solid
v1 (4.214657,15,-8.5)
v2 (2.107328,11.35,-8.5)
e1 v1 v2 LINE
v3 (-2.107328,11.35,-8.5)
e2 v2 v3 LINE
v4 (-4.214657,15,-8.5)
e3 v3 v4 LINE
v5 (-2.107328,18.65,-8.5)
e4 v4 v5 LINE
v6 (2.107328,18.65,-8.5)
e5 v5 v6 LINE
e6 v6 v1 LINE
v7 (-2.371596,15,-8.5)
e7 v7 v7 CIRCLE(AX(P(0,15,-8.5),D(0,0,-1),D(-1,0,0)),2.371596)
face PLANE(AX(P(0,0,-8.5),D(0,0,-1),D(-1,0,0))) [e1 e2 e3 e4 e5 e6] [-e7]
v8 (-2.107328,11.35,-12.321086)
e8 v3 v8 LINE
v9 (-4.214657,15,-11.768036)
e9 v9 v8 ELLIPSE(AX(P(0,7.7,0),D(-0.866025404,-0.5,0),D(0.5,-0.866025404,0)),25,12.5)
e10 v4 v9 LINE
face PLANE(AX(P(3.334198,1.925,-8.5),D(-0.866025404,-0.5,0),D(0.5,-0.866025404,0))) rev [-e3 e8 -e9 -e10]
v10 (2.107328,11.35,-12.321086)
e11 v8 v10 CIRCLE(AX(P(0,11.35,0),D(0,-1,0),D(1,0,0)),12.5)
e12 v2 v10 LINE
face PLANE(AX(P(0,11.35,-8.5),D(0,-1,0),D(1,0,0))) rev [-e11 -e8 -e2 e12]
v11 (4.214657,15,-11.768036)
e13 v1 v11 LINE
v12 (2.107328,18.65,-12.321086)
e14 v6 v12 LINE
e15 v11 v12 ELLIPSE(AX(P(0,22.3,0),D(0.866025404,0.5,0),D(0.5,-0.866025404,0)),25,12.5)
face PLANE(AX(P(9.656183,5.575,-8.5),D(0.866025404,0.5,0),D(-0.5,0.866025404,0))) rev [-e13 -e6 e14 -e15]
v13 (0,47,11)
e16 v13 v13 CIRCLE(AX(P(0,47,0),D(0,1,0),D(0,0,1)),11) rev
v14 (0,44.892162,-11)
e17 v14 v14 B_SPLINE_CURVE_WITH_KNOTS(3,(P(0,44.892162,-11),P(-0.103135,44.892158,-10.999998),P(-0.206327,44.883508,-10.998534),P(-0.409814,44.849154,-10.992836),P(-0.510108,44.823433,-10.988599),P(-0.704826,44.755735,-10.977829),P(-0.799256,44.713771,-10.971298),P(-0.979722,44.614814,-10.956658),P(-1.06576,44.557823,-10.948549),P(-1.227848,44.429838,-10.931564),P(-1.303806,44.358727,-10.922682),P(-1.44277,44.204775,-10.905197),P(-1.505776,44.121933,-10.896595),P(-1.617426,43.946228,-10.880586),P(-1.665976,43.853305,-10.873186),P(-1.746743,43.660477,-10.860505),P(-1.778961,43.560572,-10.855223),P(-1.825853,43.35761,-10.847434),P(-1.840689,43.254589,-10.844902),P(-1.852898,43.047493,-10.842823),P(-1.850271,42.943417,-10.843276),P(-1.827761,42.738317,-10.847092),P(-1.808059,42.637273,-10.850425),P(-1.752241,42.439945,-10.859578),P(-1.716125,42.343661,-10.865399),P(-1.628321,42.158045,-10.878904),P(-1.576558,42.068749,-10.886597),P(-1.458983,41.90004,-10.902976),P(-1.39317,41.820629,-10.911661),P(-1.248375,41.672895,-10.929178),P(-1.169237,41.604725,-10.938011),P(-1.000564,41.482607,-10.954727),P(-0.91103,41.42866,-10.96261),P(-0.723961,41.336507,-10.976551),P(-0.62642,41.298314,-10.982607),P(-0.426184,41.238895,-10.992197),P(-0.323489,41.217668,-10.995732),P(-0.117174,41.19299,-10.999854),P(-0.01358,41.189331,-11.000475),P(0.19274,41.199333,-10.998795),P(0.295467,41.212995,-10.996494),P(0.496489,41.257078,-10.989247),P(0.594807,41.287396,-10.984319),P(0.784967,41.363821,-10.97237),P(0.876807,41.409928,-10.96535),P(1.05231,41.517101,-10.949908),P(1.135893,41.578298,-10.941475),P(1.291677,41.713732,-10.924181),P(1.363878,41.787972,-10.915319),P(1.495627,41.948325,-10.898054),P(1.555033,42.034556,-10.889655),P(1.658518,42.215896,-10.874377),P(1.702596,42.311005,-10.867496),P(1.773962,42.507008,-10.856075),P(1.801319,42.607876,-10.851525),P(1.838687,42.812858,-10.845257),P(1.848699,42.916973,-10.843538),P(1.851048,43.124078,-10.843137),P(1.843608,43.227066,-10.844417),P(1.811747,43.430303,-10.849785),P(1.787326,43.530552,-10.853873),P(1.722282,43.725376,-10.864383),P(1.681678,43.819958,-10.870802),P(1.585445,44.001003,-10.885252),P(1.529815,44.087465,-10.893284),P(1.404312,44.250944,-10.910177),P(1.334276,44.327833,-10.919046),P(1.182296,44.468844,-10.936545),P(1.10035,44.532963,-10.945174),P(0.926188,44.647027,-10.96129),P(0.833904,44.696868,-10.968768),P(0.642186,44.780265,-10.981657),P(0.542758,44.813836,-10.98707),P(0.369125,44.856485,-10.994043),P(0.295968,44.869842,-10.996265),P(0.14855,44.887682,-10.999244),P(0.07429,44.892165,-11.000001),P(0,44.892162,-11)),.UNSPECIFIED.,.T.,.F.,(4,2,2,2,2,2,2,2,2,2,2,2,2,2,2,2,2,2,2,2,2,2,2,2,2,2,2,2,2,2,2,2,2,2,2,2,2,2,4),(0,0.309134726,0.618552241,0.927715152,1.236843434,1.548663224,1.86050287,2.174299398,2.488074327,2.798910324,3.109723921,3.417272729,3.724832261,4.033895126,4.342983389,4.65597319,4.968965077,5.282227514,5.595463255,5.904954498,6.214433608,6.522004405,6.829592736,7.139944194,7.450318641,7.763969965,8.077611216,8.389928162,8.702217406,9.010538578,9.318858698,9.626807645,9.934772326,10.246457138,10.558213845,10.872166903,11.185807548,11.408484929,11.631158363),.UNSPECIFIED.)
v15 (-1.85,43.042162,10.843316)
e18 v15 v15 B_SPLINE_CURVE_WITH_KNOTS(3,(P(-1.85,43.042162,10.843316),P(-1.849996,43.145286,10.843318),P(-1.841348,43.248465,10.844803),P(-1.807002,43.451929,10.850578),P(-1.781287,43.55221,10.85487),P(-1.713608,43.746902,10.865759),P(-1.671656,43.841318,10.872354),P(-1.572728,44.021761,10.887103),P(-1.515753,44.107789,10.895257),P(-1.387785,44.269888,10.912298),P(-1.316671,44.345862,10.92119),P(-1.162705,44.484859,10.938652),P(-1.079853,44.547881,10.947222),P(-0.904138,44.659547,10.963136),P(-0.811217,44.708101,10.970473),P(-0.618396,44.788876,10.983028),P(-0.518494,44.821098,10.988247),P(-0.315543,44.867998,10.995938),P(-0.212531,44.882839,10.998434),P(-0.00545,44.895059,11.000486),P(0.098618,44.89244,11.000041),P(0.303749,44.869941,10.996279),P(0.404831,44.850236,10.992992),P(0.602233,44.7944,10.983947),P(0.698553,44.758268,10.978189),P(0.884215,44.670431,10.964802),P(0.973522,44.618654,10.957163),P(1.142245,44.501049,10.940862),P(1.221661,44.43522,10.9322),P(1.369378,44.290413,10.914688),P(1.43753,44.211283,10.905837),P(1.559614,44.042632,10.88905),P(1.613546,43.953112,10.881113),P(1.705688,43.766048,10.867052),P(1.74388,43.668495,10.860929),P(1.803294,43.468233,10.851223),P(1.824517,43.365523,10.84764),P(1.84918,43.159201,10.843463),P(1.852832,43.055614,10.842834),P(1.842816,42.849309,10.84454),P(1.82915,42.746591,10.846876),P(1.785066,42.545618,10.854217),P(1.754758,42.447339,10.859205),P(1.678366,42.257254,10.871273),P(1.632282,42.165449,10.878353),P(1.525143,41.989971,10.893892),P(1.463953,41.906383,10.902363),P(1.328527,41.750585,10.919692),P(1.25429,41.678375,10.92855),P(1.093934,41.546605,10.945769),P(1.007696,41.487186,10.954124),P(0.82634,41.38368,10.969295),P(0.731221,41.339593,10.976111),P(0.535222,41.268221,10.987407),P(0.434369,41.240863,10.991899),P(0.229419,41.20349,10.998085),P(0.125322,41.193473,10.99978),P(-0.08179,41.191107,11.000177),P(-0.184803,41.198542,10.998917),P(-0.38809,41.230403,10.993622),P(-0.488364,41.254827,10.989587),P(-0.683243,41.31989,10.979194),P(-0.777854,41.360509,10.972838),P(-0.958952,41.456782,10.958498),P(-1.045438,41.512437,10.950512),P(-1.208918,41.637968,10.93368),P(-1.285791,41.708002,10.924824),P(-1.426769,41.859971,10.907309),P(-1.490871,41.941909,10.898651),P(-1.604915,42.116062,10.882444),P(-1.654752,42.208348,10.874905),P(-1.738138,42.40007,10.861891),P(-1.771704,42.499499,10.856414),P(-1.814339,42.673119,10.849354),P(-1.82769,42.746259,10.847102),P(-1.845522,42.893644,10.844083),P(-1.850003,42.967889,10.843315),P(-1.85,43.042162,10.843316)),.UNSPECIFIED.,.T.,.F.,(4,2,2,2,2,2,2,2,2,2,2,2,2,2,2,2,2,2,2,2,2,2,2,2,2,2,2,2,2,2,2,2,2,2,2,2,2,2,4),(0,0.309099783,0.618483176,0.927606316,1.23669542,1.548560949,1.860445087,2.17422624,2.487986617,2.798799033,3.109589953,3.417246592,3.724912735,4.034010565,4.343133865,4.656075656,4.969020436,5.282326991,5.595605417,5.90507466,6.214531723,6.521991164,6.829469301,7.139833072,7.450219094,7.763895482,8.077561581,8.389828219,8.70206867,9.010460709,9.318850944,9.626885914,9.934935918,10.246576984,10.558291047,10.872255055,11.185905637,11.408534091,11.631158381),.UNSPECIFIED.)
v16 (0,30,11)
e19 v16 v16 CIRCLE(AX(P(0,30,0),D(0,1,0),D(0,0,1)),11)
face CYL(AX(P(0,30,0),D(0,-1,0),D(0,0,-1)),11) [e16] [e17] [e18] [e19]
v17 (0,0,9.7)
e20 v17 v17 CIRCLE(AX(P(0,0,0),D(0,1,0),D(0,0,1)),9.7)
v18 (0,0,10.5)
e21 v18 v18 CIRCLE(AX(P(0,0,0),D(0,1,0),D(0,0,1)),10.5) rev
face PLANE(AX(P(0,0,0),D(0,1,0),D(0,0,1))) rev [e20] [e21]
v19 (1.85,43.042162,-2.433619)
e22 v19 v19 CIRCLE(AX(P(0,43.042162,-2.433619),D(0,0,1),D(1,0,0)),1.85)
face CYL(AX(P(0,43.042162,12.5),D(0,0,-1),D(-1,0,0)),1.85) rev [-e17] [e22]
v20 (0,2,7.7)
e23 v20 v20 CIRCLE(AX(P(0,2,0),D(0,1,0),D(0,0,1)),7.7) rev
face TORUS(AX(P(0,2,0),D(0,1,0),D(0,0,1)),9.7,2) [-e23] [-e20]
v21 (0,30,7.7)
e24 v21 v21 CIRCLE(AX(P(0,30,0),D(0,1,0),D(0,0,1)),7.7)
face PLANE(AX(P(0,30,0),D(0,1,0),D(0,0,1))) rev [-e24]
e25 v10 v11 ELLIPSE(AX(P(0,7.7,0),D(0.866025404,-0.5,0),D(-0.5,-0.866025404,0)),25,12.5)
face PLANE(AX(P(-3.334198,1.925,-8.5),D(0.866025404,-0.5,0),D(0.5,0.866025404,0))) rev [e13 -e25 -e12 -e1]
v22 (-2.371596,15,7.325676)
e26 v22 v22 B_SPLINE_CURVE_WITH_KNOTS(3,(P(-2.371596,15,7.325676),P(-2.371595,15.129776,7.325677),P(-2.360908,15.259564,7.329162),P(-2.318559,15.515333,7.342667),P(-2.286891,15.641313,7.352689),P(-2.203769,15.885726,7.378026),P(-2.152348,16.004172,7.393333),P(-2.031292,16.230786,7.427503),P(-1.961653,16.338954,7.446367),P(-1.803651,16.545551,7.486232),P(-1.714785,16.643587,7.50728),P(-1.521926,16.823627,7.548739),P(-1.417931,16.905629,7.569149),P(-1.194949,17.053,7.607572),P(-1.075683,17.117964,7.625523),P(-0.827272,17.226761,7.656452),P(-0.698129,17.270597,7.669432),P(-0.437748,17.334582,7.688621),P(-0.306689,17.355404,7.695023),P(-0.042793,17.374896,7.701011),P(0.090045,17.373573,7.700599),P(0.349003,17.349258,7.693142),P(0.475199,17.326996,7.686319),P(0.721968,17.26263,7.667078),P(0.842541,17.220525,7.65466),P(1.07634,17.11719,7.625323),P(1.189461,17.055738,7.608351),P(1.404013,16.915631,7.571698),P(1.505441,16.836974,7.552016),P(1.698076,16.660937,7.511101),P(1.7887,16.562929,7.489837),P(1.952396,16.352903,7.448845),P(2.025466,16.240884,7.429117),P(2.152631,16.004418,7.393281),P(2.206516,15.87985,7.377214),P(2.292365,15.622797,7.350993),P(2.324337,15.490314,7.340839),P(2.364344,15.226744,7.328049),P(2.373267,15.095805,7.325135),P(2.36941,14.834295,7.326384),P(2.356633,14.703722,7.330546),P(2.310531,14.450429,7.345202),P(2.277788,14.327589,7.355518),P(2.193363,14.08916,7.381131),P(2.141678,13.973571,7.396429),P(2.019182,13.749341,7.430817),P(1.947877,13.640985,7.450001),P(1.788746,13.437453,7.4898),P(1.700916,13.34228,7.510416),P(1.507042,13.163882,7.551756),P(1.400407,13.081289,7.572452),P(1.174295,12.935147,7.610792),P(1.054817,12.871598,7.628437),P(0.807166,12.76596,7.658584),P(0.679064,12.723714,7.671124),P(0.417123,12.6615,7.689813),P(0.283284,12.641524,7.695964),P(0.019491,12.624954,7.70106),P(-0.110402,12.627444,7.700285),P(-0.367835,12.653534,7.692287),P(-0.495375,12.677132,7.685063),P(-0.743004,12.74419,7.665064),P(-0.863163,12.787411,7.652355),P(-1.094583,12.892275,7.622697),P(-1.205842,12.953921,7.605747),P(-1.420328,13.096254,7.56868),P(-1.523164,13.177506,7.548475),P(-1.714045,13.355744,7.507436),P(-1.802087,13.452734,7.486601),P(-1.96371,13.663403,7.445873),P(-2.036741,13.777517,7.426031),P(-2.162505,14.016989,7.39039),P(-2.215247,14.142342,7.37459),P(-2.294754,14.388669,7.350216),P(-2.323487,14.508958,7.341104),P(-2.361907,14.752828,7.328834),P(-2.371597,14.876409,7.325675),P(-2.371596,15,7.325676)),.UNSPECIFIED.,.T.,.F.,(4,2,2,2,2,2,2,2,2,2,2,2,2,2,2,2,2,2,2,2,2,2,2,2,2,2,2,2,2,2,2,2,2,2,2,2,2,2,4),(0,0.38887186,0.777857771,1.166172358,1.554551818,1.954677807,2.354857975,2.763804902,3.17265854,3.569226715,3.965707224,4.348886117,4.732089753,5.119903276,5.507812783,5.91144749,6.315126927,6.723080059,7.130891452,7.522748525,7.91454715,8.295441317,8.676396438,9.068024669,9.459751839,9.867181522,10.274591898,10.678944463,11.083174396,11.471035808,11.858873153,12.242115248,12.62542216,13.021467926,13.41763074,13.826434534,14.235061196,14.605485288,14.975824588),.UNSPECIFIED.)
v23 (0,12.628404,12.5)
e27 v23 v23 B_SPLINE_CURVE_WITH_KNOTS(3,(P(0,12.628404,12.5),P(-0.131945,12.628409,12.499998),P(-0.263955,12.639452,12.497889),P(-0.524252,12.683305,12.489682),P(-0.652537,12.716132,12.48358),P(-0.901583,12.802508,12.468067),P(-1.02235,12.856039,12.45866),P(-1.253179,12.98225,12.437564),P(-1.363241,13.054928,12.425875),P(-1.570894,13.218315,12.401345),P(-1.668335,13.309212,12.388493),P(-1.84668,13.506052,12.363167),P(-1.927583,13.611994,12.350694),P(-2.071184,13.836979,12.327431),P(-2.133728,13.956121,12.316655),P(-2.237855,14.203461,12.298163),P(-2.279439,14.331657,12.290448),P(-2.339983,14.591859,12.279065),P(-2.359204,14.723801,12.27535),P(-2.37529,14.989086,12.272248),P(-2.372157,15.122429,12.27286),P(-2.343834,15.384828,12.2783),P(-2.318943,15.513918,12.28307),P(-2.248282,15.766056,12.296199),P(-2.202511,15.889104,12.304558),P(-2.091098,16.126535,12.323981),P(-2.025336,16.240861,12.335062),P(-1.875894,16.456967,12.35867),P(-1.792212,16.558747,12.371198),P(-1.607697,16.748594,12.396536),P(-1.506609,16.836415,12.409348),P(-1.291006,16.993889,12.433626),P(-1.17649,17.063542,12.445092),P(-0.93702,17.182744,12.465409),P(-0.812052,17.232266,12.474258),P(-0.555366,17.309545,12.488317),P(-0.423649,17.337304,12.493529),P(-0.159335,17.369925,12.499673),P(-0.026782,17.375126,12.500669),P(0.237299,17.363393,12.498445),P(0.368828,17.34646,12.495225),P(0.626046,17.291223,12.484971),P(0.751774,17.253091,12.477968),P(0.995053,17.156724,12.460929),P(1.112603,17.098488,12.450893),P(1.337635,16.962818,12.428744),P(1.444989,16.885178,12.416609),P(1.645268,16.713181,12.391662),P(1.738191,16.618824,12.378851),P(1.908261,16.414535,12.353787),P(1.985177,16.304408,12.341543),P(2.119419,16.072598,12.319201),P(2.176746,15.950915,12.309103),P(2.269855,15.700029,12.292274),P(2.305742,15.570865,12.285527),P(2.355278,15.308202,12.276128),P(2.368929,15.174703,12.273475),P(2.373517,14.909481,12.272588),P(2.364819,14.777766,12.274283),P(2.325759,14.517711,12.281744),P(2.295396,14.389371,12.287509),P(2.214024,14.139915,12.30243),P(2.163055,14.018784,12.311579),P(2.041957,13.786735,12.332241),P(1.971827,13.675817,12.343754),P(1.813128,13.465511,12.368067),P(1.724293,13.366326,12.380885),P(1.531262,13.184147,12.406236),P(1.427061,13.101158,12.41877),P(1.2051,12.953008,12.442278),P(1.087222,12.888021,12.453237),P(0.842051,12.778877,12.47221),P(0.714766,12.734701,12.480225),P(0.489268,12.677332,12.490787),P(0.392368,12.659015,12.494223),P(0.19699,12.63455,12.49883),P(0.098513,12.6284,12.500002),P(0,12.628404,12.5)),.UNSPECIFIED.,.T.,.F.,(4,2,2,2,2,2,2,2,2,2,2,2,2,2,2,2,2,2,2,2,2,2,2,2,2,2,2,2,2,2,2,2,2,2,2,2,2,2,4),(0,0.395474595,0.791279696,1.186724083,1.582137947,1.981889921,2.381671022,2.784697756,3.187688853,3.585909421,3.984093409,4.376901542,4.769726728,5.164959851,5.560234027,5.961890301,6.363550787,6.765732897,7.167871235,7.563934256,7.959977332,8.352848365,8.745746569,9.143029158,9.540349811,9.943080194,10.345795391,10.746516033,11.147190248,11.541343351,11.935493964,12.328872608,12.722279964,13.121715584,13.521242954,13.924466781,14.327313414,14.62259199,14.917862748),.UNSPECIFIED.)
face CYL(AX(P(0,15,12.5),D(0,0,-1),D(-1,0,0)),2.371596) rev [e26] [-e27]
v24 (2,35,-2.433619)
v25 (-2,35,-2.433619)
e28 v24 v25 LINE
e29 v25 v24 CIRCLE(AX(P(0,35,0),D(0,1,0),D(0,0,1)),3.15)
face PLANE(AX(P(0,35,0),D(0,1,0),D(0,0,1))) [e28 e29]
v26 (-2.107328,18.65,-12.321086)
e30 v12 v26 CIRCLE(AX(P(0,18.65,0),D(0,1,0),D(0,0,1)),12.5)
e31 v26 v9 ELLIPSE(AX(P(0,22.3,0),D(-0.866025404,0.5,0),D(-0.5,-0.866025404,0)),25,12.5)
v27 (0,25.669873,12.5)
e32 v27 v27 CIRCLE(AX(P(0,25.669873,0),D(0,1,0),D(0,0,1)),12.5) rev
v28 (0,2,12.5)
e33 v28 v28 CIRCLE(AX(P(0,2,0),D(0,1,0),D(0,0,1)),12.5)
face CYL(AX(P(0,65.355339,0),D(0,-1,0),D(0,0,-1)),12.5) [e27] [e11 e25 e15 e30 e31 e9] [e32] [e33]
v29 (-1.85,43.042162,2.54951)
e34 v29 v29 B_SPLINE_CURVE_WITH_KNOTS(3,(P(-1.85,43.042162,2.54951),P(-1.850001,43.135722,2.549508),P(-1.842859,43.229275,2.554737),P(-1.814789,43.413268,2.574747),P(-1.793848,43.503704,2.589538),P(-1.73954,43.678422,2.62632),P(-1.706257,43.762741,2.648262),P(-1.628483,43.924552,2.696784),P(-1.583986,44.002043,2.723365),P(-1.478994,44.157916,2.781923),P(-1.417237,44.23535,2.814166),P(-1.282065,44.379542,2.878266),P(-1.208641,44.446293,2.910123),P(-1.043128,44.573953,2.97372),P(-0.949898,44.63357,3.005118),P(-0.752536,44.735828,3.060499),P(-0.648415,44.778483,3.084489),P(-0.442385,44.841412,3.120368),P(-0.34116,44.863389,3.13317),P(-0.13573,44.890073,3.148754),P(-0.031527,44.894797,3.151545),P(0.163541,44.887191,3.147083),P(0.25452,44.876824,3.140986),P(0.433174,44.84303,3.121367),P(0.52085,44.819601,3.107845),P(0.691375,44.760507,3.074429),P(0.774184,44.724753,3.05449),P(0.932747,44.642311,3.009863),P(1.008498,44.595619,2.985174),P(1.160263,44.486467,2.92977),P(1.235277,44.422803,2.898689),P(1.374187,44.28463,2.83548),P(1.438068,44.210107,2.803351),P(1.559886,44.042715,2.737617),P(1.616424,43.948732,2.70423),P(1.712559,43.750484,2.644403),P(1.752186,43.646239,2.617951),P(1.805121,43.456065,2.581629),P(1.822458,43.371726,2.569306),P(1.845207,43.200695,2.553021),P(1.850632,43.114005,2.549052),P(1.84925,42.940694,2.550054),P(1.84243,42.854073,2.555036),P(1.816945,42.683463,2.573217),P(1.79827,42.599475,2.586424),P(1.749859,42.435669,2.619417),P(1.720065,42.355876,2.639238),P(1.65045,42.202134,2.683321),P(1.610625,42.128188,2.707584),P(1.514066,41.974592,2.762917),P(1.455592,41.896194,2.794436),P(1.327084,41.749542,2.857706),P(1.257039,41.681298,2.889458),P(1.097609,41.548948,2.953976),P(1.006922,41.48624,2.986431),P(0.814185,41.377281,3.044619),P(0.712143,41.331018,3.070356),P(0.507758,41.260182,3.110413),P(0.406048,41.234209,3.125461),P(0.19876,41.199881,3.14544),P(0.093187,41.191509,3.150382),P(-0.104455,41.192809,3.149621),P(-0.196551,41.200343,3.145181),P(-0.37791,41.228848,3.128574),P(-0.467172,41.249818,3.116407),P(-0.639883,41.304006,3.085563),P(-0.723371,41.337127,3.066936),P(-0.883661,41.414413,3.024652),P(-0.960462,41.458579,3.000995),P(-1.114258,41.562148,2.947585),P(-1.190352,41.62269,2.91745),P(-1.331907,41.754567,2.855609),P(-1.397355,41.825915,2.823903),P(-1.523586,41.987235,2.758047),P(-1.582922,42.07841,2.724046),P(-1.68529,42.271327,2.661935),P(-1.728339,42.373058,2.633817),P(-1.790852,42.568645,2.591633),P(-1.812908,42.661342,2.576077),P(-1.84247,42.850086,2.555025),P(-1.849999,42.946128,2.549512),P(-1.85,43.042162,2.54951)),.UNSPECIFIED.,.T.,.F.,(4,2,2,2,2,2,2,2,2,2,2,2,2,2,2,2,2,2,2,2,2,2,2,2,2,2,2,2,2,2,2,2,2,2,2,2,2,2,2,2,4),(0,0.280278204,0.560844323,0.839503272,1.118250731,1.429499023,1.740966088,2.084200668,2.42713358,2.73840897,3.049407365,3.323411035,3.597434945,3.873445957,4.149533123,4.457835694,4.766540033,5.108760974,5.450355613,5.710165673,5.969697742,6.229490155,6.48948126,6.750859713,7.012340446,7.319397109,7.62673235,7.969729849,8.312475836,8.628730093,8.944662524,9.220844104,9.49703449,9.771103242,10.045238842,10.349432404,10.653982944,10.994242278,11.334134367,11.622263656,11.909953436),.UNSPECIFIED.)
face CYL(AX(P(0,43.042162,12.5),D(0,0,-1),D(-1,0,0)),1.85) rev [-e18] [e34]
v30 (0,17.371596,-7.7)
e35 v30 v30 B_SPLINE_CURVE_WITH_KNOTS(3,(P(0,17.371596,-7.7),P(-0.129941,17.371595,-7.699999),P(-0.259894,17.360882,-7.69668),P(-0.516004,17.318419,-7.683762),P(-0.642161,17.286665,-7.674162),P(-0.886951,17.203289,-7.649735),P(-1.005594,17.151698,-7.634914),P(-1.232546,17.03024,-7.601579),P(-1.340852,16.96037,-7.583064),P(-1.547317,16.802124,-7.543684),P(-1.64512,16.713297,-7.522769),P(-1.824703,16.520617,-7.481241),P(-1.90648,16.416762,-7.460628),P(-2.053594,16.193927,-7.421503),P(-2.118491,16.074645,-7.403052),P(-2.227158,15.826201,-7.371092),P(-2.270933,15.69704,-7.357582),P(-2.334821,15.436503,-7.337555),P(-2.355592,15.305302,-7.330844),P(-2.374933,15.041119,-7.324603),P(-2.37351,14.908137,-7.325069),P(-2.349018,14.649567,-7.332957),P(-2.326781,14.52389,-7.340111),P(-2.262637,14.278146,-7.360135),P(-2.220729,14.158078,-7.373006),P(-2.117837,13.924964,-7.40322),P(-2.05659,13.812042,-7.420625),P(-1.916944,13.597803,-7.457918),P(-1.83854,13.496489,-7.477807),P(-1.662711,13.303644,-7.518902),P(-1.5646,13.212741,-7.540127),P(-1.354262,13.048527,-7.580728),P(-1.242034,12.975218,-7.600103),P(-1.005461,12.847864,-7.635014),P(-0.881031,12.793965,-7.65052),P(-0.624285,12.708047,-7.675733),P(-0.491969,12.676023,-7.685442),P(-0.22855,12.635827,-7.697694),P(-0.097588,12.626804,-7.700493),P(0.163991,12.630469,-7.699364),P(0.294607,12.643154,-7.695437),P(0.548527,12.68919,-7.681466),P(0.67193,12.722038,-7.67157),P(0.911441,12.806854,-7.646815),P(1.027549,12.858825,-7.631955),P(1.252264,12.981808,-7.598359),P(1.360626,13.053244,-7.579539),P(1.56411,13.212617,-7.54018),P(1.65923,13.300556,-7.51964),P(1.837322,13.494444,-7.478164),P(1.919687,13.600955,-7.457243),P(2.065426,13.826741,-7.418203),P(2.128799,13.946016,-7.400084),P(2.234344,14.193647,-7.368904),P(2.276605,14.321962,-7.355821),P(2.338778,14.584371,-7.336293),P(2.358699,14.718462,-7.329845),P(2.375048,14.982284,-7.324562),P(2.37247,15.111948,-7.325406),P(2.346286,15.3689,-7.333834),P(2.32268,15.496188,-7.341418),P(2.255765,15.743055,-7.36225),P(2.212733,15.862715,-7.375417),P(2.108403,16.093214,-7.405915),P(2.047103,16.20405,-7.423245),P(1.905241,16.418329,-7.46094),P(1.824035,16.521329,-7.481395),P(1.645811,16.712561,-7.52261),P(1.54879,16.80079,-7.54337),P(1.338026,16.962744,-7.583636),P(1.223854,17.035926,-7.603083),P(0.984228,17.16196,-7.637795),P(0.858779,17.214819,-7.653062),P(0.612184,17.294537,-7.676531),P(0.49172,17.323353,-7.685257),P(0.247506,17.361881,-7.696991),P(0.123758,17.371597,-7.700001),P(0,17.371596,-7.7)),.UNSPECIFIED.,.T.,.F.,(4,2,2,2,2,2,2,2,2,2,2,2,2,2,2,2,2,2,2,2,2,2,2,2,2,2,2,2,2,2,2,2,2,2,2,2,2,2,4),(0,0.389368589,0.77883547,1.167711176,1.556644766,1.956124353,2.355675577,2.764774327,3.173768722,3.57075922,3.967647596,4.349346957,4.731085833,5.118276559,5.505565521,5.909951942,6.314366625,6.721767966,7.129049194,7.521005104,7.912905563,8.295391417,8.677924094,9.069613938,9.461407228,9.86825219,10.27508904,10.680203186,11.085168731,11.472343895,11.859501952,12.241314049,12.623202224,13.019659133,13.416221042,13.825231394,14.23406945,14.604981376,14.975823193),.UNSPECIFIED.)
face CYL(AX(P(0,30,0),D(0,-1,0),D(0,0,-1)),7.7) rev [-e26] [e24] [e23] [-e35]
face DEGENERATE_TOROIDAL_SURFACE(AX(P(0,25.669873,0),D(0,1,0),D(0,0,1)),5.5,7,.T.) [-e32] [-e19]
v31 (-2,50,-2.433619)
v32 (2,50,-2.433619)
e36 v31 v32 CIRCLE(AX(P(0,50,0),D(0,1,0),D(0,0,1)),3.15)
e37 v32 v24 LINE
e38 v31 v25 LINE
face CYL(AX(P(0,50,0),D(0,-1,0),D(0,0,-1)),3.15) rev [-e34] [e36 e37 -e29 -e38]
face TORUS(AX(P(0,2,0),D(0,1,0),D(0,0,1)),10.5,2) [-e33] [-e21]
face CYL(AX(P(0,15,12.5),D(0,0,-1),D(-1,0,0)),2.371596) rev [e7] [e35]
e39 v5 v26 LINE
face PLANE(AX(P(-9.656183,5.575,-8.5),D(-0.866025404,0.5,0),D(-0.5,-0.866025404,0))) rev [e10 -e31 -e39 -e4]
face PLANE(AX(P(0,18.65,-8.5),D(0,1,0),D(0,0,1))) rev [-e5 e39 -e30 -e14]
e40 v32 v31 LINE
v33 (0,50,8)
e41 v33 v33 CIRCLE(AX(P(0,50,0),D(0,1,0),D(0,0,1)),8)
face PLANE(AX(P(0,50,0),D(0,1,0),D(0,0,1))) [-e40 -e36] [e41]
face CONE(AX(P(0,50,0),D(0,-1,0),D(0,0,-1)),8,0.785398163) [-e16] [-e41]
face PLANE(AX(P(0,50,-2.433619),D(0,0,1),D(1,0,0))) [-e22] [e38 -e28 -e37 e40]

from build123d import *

# Parameters (mm, degrees)
SKETCH1_R           = 11
SKETCH1_R_2         = 7.7
BOSS_EXTRUDE1_DEPTH = 30
BOSS_EXTRUDE2_START = 30
SKETCH1_2_R         = 11
SKETCH1_2_R_2       = 7.7
BOSS_EXTRUDE2_DEPTH = 5
BOSS_EXTRUDE3_START = 35
SKETCH1_4_R         = 11
SKETCH1_4_R_2       = 7.7
SKETCH1_4_R_3       = 3.15
BOSS_EXTRUDE3_DEPTH = 15
SKETCH1_5_R         = 12.5
SKETCH1_5_R_2       = 11
BOSS_EXTRUDE4_DEPTH = 30
SKETCH2_R           = 1.85
CUT_EXTRUDE1_DEPTH  = 58.282196187
SKETCH2_7_R         = 2.371596242
CUT_EXTRUDE2_DEPTH  = 4
SKETCH2_8_R         = 2.371596242
CUT_EXTRUDE3_DEPTH  = 58.282196274
FILLET1_R           = 7
FILLET2_R           = 2
CHAMFER1_SIZE       = 3


with BuildPart() as part:
    # Sketch1 → Boss-Extrude1 (new body)
    with BuildSketch(Plane(origin=(0, 0, 0), x_dir=(1, 0, 0), z_dir=(0, 1, 0))):
        with Locations(Location((0, 0, 0), (0, 0, 270))):
            Circle(SKETCH1_R)
        with Locations(Location((0, 0, 0), (0, 0, 270))):
            Circle(SKETCH1_R_2, mode=Mode.SUBTRACT)
    extrude(amount=BOSS_EXTRUDE1_DEPTH)

    # Sketch1<2> → Boss-Extrude2 (add)
    # profile 1 of 6: a face of its own
    with BuildSketch(Plane(origin=(0, 0, 0), x_dir=(1, 0, 0), z_dir=(0, 1, 0)).offset(BOSS_EXTRUDE2_START)):
        with Locations(Location((0, 0, 0), (0, 0, 270))):
            Circle(SKETCH1_2_R)
        with Locations(Location((0, 0, 0), (0, 0, 270))):
            Circle(SKETCH1_2_R_2, mode=Mode.SUBTRACT)
    # profile 2 of 6: a face of its own
    with BuildSketch(Plane(origin=(0, 0, 0), x_dir=(1, 0, 0), z_dir=(0, 1, 0)).offset(BOSS_EXTRUDE2_START)):
        with Locations(Location((0, 0, 0), (0, 0, 270))):
            Circle(SKETCH1_2_R_2)
    # profile 3 of 6: a face of its own
    with BuildSketch(Plane(origin=(0, 0, 0), x_dir=(1, 0, 0), z_dir=(0, 1, 0)).offset(BOSS_EXTRUDE2_START)):
        with BuildLine():
            ThreePointArc((2, 2.433618705), (0, 3.15), (-2, 2.433618705))
            Line((-2, 2.433618705), (2, 2.433618705))
        make_face()
    # profile 4 of 6: a face of its own
    with BuildSketch(Plane(origin=(0, 0, 0), x_dir=(1, 0, 0), z_dir=(0, 1, 0)).offset(BOSS_EXTRUDE2_START)):
        with BuildLine():
            Line((2, 2.433618705), (-2, 2.433618705))
            ThreePointArc((-2, 2.433618705), (-1.345826883, -2.848025632), (3.15, 0))
            ThreePointArc((3.15, 0), (2.848025632, 1.345826883), (2, 2.433618705))
        make_face()
    # profile 5 of 6: a face of its own
    with BuildSketch(Plane(origin=(0, 0, 0), x_dir=(1, 0, 0), z_dir=(0, 1, 0)).offset(BOSS_EXTRUDE2_START)):
        with BuildLine():
            ThreePointArc((2, 2.433618705), (0, 3.15), (-2, 2.433618705))
            Line((-2, 2.433618705), (2, 2.433618705))
        make_face()
    # profile 6 of 6: a face of its own
    with BuildSketch(Plane(origin=(0, 0, 0), x_dir=(1, 0, 0), z_dir=(0, 1, 0)).offset(BOSS_EXTRUDE2_START)):
        with BuildLine():
            Line((2, 2.433618705), (-2, 2.433618705))
            ThreePointArc((-2, 2.433618705), (-1.345826883, -2.848025632), (3.15, 0))
            ThreePointArc((3.15, 0), (2.848025632, 1.345826883), (2, 2.433618705))
        make_face()
    extrude(amount=BOSS_EXTRUDE2_DEPTH)

    # Sketch1<4> → Boss-Extrude3 (add)
    # profile 1 of 3: a face of its own
    with BuildSketch(Plane(origin=(0, 0, 0), x_dir=(1, 0, 0), z_dir=(0, 1, 0)).offset(BOSS_EXTRUDE3_START)):
        with Locations(Location((0, 0, 0), (0, 0, 270))):
            Circle(SKETCH1_4_R)
        with Locations(Location((0, 0, 0), (0, 0, 270))):
            Circle(SKETCH1_4_R_2, mode=Mode.SUBTRACT)
    # profile 2 of 3: a face of its own
    with BuildSketch(Plane(origin=(0, 0, 0), x_dir=(1, 0, 0), z_dir=(0, 1, 0)).offset(BOSS_EXTRUDE3_START)):
        with Locations(Location((0, 0, 0), (0, 0, 270))):
            Circle(SKETCH1_4_R_2)
        Circle(SKETCH1_4_R_3, mode=Mode.SUBTRACT)
    # profile 3 of 3: a face of its own
    with BuildSketch(Plane(origin=(0, 0, 0), x_dir=(1, 0, 0), z_dir=(0, 1, 0)).offset(BOSS_EXTRUDE3_START)):
        with BuildLine():
            ThreePointArc((2, 2.433618705), (0, 3.15), (-2, 2.433618705))
            Line((-2, 2.433618705), (2, 2.433618705))
        make_face()
    extrude(amount=BOSS_EXTRUDE3_DEPTH)

    # Sketch1<5> → Boss-Extrude4 (add)
    with BuildSketch(Plane(origin=(0, 0, 0), x_dir=(1, 0, 0), z_dir=(0, 1, 0))):
        with Locations(Location((0, 0, 0), (0, 0, 270))):
            Circle(SKETCH1_5_R)
        with Locations(Location((0, 0, 0), (0, 0, 270))):
            Circle(SKETCH1_5_R_2, mode=Mode.SUBTRACT)
    extrude(amount=BOSS_EXTRUDE4_DEPTH)

    # Sketch2 → Cut-Extrude1 (cut, through all)
    with BuildSketch(Plane(origin=(0, 0, -12.5), x_dir=(-1, 0, 0), z_dir=(0, 0, -1))):
        with Locations(Location((0, 43.042161893, 0), (0, 0, 90))):
            Circle(SKETCH2_R)
    extrude(amount=-CUT_EXTRUDE1_DEPTH, mode=Mode.SUBTRACT)

    # Sketch2<7> → Cut-Extrude2 (cut)
    # profile 1 of 2: a face of its own
    with BuildSketch(Plane(origin=(0, 0, -12.5), x_dir=(-1, 0, 0), z_dir=(0, 0, -1))):
        Polygon((-2.107328483, 11.35), (2.107328483, 11.35), (4.214656965, 15), (2.107328483, 18.65), (-2.107328483, 18.65), (-4.214656965, 15), align=None)
        with Locations((0, 15)):
            Circle(SKETCH2_7_R, mode=Mode.SUBTRACT)
    # profile 2 of 2: a face of its own
    with BuildSketch(Plane(origin=(0, 0, -12.5), x_dir=(-1, 0, 0), z_dir=(0, 0, -1))):
        with Locations((0, 15)):
            Circle(SKETCH2_7_R)
    extrude(amount=-CUT_EXTRUDE2_DEPTH, mode=Mode.SUBTRACT)

    # Sketch2<8> → Cut-Extrude3 (cut, through all)
    with BuildSketch(Plane(origin=(0, 0, -12.5), x_dir=(-1, 0, 0), z_dir=(0, 0, -1))):
        with Locations((0, 15)):
            Circle(SKETCH2_8_R)
    extrude(amount=-CUT_EXTRUDE3_DEPTH, mode=Mode.SUBTRACT)

    # Fillet1
    # the kernel refuses this fillet: 7 mm, written as the material it takes off along each edge
    with BuildSketch(Plane(origin=(0, 30, 0), x_dir=(0, 0, 1), z_dir=(-1, 0, 0))) as fillet1_piece_1:
        with BuildLine():
            CenterArc((5.5, -4.330127019), FILLET1_R, 0, 38.213210702)
            Line((12.5, -4.330127019), (12.64, -4.330127019))
            Line((12.64, -4.330127019), (12.64, 0))
            Line((12.64, 0), (12.5, 0.14))
            ThreePointArc((12.5, 0.14), (11.75, 0.14), (11.11, 0.08660254))
            Line((11.11, 0.08660254), (11, 0))
        make_face()
    revolve(axis=Axis((0, 30, 0), (0, 1, 0)), mode=Mode.SUBTRACT)

    # Fillet2
    fillet2_edges = [part.edges().sort_by_distance(p)[0] for p in [
        (0, 0, -12.5),
        (0, 0, -7.7),
    ]]
    fillet(fillet2_edges, radius=FILLET2_R)

    # Chamfer1
    chamfer1_edges = [part.edges().sort_by_distance(p)[0] for p in [
        (0, 50, -11),
    ]]
    chamfer(chamfer1_edges, length=CHAMFER1_SIZE)


solid = part.part
